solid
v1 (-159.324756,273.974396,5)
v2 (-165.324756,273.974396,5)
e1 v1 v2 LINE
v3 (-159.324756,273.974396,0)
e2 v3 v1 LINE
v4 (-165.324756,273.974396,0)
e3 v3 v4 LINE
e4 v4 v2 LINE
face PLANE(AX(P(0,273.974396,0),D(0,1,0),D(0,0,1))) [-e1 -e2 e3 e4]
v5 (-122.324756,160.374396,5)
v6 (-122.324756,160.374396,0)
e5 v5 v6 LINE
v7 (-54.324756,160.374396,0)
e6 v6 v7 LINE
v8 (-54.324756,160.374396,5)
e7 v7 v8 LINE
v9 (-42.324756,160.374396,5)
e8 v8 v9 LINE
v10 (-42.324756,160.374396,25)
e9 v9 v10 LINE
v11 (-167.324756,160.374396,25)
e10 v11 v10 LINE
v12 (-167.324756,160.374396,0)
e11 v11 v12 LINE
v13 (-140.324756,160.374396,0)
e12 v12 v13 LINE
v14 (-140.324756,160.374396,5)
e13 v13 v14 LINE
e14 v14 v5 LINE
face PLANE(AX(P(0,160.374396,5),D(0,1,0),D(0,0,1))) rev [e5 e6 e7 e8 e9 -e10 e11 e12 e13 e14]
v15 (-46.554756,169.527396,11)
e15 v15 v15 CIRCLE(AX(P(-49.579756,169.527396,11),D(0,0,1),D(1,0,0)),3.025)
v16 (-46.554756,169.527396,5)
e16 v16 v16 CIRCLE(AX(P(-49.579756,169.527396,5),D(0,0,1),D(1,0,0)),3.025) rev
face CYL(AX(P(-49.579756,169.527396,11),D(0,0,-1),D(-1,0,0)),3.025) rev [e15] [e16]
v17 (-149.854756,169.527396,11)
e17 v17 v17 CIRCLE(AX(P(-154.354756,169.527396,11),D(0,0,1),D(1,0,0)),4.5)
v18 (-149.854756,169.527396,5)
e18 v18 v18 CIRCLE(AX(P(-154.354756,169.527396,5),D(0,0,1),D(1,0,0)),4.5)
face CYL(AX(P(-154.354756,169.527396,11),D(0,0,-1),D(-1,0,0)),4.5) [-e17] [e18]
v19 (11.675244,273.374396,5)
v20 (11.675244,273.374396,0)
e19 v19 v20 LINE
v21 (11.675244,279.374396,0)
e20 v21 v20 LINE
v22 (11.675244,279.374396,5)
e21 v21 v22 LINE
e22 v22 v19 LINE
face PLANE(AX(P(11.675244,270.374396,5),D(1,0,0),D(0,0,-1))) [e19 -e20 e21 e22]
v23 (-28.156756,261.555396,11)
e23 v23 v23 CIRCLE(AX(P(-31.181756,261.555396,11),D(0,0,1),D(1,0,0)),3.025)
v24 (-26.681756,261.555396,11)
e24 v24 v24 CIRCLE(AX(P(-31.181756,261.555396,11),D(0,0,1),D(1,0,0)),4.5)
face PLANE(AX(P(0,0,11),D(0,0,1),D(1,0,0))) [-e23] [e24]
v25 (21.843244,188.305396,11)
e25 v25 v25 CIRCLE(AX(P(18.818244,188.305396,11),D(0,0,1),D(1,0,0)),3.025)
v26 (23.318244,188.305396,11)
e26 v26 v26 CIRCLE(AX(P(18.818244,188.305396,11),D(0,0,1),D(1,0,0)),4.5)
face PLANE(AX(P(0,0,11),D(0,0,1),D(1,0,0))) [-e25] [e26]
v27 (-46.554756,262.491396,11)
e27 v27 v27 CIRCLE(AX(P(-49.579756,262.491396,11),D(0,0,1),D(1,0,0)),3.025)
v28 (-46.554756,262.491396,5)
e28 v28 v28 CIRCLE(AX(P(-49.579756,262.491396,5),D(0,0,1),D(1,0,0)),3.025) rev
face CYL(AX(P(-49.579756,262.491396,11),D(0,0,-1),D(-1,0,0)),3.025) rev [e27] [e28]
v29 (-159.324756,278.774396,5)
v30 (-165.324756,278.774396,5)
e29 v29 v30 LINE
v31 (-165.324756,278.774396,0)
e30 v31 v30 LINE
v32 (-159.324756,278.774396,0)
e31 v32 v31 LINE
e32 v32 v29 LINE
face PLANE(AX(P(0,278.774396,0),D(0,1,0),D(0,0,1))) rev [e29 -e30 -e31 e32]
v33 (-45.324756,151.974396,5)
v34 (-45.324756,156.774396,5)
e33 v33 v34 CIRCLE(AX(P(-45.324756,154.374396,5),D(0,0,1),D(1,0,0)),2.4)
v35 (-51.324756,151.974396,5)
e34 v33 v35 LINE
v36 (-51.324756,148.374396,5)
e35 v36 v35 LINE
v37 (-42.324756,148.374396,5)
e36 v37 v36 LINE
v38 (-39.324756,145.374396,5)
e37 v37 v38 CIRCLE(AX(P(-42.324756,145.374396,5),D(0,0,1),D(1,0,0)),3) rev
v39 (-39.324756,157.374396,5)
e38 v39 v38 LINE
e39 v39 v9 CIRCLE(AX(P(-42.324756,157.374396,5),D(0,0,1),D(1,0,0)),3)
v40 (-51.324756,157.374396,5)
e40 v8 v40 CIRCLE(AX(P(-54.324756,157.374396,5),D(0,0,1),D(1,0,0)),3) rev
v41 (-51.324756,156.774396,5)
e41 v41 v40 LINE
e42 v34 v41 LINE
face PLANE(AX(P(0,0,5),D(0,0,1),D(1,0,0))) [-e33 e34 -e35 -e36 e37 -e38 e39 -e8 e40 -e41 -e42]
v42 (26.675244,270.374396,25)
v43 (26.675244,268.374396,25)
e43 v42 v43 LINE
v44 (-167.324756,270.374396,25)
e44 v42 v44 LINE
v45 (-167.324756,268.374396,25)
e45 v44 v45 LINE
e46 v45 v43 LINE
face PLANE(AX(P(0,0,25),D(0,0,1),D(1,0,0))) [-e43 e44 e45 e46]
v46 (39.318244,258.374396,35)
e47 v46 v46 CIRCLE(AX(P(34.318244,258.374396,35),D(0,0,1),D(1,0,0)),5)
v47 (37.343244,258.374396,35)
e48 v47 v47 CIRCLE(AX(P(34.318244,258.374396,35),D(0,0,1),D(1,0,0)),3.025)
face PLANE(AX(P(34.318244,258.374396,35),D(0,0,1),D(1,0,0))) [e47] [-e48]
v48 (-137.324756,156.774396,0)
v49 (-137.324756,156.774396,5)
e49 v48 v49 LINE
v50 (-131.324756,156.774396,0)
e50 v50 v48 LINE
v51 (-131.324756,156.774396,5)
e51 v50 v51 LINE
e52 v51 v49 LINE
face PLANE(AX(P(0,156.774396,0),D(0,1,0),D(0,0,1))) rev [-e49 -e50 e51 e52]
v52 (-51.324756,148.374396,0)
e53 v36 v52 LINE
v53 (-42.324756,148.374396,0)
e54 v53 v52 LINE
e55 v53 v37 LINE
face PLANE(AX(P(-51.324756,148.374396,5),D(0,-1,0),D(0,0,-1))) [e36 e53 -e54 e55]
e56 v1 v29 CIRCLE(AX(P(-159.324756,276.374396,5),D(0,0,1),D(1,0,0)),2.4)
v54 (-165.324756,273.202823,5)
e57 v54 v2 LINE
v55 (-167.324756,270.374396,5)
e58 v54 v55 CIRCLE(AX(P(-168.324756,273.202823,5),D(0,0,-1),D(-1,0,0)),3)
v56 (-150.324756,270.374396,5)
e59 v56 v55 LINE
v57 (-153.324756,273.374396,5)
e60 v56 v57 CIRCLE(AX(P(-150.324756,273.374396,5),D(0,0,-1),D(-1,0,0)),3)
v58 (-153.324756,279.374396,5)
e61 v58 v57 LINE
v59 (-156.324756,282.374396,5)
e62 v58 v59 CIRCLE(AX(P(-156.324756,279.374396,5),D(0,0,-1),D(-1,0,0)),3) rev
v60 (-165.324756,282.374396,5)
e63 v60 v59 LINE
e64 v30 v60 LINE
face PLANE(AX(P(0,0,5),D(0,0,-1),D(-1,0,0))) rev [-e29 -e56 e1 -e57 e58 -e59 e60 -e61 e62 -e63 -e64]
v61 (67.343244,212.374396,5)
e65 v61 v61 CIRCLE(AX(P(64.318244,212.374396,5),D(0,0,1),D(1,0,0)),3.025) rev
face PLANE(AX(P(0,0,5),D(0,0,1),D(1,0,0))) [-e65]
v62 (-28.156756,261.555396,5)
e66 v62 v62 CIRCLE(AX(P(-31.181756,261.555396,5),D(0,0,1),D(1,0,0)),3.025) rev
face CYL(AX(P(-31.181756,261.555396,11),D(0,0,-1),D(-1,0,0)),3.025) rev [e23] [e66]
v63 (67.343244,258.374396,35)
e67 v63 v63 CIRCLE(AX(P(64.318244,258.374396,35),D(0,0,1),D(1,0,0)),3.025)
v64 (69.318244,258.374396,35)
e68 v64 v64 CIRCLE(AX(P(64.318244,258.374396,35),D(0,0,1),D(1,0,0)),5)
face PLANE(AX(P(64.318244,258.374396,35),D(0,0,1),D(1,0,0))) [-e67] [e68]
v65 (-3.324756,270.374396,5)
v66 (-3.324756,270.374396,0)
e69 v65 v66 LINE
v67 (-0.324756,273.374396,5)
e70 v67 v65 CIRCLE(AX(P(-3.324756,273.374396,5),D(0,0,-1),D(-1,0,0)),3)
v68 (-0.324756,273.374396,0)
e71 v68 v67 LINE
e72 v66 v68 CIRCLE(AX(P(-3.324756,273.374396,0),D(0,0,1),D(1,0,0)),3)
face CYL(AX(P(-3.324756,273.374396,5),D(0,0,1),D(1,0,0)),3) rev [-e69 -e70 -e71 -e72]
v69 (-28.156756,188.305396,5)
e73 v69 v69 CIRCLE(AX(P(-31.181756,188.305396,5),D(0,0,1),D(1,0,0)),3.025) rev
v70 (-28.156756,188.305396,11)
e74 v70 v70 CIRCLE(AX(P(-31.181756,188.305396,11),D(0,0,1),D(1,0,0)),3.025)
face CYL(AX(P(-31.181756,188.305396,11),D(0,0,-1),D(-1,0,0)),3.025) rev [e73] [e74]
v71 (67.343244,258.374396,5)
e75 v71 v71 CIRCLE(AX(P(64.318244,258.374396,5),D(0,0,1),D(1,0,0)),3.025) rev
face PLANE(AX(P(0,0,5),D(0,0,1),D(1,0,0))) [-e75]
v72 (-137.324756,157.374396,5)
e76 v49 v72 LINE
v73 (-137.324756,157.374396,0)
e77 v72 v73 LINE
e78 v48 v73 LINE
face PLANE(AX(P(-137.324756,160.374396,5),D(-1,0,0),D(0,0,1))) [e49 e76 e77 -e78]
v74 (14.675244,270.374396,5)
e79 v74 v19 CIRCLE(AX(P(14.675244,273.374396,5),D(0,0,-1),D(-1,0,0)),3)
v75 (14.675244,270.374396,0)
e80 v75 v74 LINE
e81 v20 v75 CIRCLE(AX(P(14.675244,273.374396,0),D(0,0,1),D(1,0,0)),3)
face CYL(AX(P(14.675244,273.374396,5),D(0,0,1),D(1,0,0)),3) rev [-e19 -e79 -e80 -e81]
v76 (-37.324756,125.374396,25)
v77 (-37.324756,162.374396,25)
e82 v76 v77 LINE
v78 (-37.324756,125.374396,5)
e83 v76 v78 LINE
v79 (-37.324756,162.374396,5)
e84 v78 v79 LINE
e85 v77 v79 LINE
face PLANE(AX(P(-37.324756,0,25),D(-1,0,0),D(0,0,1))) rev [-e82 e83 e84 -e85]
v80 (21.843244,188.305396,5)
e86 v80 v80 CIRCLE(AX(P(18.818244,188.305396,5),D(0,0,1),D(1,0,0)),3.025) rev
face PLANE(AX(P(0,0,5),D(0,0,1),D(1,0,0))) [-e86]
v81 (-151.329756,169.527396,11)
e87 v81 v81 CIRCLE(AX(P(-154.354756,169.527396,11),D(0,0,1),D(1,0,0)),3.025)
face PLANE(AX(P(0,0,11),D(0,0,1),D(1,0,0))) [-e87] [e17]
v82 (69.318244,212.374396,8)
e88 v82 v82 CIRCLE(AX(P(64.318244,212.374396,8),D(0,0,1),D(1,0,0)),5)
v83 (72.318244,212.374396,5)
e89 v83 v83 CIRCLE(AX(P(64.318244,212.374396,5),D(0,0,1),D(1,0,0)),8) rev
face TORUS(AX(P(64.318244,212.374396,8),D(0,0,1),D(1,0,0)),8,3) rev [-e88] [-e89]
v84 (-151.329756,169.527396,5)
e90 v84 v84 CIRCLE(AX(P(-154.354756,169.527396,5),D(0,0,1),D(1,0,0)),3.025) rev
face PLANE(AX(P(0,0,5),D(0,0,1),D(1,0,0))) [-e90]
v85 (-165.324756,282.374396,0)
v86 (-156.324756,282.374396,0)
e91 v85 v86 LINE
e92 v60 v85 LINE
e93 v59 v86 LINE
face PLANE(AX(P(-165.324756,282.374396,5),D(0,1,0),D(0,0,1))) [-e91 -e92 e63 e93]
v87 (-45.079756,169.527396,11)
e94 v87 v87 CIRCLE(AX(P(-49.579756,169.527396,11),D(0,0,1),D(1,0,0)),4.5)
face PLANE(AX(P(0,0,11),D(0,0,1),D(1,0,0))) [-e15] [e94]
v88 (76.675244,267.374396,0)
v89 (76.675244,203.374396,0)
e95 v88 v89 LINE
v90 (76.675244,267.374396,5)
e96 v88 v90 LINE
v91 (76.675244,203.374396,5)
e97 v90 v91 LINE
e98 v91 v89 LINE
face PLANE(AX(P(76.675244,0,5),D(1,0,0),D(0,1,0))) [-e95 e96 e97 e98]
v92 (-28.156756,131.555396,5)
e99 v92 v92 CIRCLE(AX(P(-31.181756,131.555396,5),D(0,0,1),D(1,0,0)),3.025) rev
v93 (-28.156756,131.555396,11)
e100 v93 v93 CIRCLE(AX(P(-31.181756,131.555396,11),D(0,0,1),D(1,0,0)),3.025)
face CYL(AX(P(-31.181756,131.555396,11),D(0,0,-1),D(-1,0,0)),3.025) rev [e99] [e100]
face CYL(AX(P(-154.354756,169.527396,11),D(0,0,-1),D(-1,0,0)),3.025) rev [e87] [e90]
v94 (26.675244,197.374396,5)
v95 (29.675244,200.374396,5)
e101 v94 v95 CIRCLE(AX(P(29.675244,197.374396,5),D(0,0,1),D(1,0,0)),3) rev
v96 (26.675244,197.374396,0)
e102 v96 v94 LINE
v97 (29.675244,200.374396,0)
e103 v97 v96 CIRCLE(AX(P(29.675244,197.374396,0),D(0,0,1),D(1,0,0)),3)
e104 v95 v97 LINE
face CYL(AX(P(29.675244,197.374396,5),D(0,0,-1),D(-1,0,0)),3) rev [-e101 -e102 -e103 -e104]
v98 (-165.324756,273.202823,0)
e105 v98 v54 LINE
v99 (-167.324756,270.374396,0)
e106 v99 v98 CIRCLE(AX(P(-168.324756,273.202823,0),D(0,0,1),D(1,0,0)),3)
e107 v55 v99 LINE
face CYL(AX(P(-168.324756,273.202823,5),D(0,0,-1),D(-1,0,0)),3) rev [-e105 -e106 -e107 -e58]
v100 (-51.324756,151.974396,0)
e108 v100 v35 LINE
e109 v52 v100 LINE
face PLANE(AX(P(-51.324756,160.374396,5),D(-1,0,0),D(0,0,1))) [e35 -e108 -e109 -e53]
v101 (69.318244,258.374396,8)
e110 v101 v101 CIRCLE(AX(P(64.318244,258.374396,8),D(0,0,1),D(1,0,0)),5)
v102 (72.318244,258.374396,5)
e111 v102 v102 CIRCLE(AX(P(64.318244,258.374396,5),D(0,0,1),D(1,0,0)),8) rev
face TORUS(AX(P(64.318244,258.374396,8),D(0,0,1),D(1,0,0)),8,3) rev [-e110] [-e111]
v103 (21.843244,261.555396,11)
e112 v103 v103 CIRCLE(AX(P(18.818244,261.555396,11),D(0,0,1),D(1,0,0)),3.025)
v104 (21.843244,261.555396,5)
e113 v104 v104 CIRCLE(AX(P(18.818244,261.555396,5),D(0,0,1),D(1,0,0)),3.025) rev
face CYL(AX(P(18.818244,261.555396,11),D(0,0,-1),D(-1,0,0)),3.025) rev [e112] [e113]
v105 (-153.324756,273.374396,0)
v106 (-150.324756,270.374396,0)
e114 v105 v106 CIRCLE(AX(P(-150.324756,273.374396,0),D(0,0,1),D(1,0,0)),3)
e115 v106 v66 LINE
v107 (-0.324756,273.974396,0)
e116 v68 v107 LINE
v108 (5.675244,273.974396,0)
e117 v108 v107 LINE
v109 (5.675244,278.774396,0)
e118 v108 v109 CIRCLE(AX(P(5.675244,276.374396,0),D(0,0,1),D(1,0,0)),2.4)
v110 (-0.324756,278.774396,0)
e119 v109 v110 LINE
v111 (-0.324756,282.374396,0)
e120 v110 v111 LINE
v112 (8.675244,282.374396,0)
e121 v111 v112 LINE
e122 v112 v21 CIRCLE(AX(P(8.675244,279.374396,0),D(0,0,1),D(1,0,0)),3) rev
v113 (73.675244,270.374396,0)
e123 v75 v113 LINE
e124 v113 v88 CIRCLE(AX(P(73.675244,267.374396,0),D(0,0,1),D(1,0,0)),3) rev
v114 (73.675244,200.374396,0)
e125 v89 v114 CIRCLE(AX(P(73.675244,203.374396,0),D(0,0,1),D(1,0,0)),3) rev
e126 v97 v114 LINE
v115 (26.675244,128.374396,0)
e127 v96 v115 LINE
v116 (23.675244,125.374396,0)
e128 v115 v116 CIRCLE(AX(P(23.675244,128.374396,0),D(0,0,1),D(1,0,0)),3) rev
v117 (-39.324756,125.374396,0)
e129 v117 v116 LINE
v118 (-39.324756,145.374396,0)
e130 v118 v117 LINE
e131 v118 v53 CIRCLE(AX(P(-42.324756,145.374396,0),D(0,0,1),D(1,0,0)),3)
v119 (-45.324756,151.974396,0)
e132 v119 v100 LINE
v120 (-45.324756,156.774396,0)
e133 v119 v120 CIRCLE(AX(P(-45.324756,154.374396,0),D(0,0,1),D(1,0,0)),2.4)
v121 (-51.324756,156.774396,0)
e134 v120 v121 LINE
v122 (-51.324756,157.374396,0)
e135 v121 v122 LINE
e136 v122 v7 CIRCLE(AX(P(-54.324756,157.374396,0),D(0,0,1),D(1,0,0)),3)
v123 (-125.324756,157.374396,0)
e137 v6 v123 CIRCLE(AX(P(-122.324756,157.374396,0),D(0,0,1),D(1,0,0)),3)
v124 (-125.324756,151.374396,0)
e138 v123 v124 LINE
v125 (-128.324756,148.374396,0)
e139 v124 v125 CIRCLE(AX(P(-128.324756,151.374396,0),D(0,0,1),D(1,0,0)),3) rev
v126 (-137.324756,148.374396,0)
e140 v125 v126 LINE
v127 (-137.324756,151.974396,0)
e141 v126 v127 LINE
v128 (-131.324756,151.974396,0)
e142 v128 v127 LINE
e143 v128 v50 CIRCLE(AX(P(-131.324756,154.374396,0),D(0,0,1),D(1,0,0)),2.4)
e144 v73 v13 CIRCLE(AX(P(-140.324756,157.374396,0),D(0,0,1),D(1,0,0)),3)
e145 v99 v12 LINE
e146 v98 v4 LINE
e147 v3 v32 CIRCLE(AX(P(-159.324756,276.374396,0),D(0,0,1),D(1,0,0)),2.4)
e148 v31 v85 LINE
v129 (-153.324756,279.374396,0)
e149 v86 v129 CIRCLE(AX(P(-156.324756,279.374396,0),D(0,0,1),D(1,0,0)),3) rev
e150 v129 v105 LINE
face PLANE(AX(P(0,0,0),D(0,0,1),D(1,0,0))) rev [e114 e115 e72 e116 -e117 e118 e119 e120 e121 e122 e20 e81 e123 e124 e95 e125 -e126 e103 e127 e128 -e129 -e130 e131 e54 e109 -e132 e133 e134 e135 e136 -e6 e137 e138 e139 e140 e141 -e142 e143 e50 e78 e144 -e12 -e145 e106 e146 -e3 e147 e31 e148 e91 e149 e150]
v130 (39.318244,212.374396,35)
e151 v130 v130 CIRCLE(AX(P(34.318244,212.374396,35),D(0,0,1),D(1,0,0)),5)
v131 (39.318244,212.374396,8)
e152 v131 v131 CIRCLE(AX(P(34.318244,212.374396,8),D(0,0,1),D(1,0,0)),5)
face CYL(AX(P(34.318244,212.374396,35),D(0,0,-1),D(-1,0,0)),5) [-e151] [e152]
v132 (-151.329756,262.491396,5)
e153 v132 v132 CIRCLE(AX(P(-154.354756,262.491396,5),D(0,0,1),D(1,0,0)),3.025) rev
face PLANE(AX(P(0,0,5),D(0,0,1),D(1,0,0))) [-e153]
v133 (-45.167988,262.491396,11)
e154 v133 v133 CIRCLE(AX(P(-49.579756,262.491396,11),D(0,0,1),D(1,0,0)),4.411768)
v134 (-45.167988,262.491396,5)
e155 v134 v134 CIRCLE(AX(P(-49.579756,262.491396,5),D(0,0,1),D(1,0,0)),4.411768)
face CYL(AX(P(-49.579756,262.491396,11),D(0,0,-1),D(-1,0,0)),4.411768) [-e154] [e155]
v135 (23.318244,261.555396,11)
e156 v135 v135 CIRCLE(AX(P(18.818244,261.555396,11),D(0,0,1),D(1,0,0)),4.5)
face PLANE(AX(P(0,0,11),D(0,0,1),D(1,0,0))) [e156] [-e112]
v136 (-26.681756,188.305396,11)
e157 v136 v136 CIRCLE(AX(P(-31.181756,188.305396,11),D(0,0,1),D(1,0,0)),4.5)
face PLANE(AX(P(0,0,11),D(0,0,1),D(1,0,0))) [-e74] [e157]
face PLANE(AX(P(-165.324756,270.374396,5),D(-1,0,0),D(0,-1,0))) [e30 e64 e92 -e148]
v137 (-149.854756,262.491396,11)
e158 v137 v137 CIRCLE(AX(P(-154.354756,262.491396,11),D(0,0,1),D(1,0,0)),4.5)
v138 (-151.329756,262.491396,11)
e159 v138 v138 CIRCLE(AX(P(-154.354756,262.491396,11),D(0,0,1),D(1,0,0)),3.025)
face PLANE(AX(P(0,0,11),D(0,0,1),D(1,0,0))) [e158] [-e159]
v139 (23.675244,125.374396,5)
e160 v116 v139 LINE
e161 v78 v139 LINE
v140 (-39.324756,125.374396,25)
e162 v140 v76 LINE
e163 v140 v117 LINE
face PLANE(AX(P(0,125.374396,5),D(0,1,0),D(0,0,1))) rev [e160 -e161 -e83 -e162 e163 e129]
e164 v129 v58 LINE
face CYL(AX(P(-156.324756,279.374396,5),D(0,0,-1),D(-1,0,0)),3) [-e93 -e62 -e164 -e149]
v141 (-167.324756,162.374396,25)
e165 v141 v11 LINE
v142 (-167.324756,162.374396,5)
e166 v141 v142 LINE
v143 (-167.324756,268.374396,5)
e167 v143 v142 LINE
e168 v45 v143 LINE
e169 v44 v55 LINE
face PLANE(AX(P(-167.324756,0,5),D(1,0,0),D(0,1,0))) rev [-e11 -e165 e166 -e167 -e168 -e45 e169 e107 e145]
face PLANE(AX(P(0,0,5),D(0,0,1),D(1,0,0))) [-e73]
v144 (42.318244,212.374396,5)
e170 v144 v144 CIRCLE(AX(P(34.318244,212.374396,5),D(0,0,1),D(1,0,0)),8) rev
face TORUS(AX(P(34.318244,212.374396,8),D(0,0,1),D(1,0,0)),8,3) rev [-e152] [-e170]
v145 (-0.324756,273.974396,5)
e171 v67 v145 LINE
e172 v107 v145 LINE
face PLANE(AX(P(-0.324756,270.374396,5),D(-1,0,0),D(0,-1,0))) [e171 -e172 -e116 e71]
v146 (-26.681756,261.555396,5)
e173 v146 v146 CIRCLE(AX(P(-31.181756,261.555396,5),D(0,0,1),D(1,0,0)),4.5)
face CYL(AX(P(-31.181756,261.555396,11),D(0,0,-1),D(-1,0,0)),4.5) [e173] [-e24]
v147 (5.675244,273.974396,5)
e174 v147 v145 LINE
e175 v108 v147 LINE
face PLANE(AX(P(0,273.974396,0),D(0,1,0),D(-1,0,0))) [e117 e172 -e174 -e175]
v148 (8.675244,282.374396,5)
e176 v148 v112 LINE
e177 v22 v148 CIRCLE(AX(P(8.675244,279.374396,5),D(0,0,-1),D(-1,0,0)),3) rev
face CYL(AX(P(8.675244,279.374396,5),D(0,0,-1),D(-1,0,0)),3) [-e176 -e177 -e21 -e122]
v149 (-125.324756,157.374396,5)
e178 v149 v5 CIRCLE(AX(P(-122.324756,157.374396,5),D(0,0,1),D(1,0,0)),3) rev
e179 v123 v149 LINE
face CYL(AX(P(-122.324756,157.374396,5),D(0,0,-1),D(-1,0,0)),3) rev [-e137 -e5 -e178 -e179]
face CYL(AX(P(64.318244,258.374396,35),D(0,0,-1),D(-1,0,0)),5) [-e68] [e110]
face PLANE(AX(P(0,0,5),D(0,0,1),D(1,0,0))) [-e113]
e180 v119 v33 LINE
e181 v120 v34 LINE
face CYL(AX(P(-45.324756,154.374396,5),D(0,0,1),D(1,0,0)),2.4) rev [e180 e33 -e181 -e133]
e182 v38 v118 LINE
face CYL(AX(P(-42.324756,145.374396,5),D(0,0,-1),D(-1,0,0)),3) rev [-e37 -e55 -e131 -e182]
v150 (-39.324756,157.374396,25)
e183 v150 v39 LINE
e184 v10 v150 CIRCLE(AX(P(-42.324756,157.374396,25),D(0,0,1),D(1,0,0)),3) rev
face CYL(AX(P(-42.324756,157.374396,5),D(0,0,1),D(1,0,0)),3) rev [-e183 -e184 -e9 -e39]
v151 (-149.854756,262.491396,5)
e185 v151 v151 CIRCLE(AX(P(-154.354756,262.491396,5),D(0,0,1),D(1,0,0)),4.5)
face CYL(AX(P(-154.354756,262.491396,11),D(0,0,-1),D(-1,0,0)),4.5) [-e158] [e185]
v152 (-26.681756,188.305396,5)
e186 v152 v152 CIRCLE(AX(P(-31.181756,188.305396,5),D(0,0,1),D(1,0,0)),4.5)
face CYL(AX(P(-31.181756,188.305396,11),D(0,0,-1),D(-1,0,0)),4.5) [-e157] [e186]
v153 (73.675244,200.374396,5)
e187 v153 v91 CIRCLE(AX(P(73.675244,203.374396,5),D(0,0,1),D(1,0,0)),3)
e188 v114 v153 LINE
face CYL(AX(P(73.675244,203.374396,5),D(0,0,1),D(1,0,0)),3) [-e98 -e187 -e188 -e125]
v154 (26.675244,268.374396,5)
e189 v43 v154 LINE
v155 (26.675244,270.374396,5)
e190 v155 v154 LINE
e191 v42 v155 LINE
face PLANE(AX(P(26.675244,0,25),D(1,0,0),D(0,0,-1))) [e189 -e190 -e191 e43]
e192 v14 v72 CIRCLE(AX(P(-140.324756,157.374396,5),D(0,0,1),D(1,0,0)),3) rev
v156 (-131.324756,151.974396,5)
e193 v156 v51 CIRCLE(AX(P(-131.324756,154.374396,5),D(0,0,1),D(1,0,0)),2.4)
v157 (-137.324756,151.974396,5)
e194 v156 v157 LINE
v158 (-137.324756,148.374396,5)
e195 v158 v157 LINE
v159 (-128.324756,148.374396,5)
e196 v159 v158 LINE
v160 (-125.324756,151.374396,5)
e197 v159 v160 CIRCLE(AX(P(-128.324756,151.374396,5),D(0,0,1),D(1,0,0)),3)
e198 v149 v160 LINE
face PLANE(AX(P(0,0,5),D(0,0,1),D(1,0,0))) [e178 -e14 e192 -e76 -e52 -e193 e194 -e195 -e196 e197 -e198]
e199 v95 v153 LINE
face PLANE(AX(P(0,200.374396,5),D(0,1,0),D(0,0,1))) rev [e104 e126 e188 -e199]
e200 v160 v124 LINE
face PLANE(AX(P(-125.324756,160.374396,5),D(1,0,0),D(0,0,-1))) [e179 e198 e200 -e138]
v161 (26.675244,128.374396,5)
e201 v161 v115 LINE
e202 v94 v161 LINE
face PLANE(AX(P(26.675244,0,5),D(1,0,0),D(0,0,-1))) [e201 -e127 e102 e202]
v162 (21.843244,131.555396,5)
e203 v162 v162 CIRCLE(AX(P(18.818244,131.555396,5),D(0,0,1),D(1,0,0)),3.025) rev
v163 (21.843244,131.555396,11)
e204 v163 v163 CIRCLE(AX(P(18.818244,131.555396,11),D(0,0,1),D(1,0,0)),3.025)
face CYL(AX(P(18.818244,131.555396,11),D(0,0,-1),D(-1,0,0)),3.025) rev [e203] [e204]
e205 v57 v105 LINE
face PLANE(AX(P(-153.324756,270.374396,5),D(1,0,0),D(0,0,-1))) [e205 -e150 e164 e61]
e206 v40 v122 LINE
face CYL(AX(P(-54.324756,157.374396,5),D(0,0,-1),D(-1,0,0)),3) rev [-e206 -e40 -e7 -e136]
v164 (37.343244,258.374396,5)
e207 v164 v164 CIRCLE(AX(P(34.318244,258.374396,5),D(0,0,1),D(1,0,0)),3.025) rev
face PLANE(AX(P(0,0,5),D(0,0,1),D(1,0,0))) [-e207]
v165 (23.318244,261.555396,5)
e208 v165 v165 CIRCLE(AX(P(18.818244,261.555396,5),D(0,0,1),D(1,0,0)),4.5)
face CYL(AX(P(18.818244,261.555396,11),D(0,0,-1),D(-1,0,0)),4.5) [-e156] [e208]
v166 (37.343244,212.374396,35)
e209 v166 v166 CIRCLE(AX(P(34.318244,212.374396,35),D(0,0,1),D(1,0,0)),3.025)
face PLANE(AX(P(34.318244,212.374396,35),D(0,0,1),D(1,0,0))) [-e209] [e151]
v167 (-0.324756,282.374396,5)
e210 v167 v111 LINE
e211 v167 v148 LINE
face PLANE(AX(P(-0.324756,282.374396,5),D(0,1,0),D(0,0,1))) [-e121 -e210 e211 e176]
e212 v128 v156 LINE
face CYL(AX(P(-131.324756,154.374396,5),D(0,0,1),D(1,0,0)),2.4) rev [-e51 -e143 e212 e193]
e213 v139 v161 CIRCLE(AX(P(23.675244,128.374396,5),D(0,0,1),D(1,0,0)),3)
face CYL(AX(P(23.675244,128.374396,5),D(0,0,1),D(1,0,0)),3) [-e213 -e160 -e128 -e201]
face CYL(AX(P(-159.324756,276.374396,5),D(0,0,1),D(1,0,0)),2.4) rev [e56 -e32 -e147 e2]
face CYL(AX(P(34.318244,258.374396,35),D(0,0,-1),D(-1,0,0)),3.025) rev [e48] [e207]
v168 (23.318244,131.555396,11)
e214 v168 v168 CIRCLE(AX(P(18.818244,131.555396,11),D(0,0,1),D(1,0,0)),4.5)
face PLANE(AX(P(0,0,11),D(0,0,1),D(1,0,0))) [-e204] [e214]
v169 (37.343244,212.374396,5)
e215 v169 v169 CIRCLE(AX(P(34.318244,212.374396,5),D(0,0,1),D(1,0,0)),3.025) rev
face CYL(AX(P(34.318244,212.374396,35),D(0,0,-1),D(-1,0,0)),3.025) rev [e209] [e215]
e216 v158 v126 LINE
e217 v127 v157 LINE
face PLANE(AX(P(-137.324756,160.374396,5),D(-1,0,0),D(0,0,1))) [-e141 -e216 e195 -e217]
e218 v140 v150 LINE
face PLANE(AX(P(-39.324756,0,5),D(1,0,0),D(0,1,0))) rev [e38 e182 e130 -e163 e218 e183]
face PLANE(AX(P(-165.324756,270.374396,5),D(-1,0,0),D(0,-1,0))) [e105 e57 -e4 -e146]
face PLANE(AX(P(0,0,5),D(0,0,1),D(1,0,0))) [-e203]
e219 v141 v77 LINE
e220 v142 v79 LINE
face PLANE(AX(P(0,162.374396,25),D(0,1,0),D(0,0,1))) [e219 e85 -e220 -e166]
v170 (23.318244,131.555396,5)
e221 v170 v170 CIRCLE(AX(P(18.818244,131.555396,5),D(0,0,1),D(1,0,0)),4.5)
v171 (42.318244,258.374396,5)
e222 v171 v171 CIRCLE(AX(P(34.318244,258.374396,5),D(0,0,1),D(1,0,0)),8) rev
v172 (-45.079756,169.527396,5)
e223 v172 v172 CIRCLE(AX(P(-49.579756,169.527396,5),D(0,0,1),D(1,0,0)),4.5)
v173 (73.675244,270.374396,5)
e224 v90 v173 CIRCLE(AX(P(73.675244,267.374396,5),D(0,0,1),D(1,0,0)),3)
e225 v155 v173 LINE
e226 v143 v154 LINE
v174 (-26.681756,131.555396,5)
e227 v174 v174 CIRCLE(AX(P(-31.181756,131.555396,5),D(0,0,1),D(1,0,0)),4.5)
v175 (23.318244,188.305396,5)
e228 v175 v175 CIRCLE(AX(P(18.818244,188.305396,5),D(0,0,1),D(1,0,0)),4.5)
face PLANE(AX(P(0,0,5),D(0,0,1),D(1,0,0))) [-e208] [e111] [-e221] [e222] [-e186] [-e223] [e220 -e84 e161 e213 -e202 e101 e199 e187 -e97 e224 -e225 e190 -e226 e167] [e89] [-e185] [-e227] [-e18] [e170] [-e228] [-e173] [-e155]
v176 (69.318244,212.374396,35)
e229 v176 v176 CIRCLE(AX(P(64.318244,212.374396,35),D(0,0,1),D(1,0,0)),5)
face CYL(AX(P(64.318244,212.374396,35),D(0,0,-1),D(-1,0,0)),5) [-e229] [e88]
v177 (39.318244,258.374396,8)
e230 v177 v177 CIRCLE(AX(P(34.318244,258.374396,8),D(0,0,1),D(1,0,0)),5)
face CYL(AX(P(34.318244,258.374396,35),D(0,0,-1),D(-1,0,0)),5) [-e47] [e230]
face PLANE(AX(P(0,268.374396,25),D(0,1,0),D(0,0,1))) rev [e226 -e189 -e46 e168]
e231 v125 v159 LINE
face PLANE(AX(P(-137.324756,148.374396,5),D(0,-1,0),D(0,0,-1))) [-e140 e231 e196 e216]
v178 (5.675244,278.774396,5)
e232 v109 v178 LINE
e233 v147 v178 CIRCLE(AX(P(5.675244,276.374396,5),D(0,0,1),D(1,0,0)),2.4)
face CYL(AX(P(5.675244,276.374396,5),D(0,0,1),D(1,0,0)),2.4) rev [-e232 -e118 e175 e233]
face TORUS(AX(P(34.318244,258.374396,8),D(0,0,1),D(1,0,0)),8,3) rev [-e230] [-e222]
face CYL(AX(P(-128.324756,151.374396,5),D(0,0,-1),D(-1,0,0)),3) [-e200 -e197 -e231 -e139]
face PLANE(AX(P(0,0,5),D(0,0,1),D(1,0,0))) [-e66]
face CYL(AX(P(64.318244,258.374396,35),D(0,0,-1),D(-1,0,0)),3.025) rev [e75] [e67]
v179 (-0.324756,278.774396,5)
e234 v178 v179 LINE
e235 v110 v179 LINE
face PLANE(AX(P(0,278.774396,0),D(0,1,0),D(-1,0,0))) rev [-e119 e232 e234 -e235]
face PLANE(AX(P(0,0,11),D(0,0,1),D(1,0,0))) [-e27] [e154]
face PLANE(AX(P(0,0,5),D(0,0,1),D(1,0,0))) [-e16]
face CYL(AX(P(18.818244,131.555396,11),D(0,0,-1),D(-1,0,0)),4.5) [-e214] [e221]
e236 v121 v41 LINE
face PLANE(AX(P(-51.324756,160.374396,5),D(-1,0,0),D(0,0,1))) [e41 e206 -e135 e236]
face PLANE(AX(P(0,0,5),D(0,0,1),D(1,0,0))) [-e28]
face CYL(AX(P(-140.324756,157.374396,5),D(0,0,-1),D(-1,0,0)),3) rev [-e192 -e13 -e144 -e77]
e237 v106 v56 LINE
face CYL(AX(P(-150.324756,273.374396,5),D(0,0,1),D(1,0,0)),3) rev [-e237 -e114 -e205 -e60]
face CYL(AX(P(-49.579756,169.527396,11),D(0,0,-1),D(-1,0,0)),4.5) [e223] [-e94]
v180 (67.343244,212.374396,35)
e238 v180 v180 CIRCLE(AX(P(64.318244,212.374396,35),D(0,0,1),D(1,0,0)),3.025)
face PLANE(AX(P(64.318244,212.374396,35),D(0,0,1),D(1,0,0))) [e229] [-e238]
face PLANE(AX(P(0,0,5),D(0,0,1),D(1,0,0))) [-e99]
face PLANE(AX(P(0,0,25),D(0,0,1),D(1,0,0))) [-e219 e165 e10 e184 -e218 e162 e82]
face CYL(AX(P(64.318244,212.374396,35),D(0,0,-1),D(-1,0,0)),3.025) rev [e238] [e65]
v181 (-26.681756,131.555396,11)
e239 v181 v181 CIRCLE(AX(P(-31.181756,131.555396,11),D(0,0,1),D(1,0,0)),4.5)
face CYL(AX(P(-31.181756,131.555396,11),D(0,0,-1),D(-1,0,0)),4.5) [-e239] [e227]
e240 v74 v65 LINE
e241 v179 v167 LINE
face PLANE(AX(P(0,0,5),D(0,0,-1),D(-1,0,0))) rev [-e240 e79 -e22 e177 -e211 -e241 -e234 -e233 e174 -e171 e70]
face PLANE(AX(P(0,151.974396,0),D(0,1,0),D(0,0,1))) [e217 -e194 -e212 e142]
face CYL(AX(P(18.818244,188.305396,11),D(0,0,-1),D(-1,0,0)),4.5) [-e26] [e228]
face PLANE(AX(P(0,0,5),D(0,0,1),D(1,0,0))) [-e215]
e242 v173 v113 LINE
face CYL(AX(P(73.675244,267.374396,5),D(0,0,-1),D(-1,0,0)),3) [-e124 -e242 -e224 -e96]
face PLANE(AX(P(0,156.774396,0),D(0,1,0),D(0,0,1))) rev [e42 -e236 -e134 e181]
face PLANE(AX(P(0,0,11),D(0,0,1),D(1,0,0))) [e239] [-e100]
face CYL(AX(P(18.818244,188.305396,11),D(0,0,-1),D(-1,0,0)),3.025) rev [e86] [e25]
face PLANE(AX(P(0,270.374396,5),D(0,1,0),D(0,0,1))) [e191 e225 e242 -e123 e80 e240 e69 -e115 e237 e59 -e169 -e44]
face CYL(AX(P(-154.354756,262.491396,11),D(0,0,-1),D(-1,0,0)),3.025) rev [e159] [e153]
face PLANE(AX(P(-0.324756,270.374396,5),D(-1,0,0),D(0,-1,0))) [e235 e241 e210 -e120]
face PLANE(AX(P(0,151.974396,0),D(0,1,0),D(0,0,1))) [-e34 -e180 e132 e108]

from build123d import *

# Parameters (mm, degrees)
SKETCH1_W            = 128
SKETCH1_H            = 110
SKETCH1_W_2          = 50
SKETCH1_H_2          = 70
BOSS_EXTRUDE1_DEPTH  = 5
SKETCH2_R            = 4.5
SKETCH2_R_2          = 3.025
SKETCH2_R_3          = 4.411768353
BOSS_EXTRUDE2_DEPTH  = 6
SKETCH3_W            = 194
SKETCH3_H            = 2
BOSS_EXTRUDE3_DEPTH  = 20
SKETCH6_W            = 12
SKETCH6_H            = 12
BOSS_EXTRUDE5_DEPTH  = 5
M4_CLEARANCE_HOLE1_D = 4.8
CUT_EXTRUDE1_DEPTH   = 329.83563266
FILLET2_R            = 3
FILLET3_R            = 3
SKETCH11_R           = 5
SKETCH11_R_2         = 3.025
BOSS_EXTRUDE6_DEPTH  = 30
FILLET4_R            = 3


with BuildPart() as part:
    # Sketch1 → Boss-Extrude1 (new body)
    with BuildSketch(Plane.XY):
        with Locations((-103.32475602, 215.37439567)):
            Rectangle(SKETCH1_W, SKETCH1_H)
        Polygon((26.67524398, 270.37439567), (-39.32475602, 270.37439567), (-39.32475602, 160.37439567), (-39.32475602, 125.37439567), (26.67524398, 125.37439567), (26.67524398, 195.37439567), (26.67524398, 200.37439567), align=None)
        with Locations((51.67524398, 235.37439567)):
            Rectangle(SKETCH1_W_2, SKETCH1_H_2)
    extrude(amount=BOSS_EXTRUDE1_DEPTH)

    # Sketch2 → Boss-Extrude2 (add)
    # profile 1 of 10: a face of its own
    with BuildSketch(Plane.XY.offset(5)):
        with Locations((-49.57975602, 169.52739567)):
            Circle(SKETCH2_R)
        with Locations((-49.57975602, 169.52739567)):
            Circle(SKETCH2_R_2, mode=Mode.SUBTRACT)
    # profile 2 of 10: a face of its own
    with BuildSketch(Plane.XY.offset(5)):
        with Locations((-31.18175602, 188.30539567)):
            Circle(SKETCH2_R)
        with Locations((-31.18175602, 188.30539567)):
            Circle(SKETCH2_R_2, mode=Mode.SUBTRACT)
    # profile 3 of 10: a face of its own
    with BuildSketch(Plane.XY.offset(5)):
        with Locations((-31.18175602, 131.55539567)):
            Circle(SKETCH2_R)
        with Locations((-31.18175602, 131.55539567)):
            Circle(SKETCH2_R_2, mode=Mode.SUBTRACT)
    # profile 4 of 10: a face of its own
    with BuildSketch(Plane.XY.offset(5)):
        with Locations((18.81824398, 131.55539567)):
            Circle(SKETCH2_R)
        with Locations((18.81824398, 131.55539567)):
            Circle(SKETCH2_R_2, mode=Mode.SUBTRACT)
    # profile 5 of 10: a face of its own
    with BuildSketch(Plane.XY.offset(5)):
        with Locations((18.81824398, 188.30539567)):
            Circle(SKETCH2_R)
        with Locations((18.81824398, 188.30539567)):
            Circle(SKETCH2_R_2, mode=Mode.SUBTRACT)
    # profile 6 of 10: a face of its own
    with BuildSketch(Plane.XY.offset(5)):
        with Locations((18.81824398, 261.55539567)):
            Circle(SKETCH2_R)
        with Locations((18.81824398, 261.55539567)):
            Circle(SKETCH2_R_2, mode=Mode.SUBTRACT)
    # profile 7 of 10: a face of its own
    with BuildSketch(Plane.XY.offset(5)):
        with Locations((-49.57975602, 262.49139567)):
            Circle(SKETCH2_R_3)
        with Locations((-49.57975602, 262.49139567)):
            Circle(SKETCH2_R_2, mode=Mode.SUBTRACT)
    # profile 8 of 10: a face of its own
    with BuildSketch(Plane.XY.offset(5)):
        with Locations((-154.35475602, 262.49139567)):
            Circle(SKETCH2_R)
        with Locations((-154.35475602, 262.49139567)):
            Circle(SKETCH2_R_2, mode=Mode.SUBTRACT)
    # profile 9 of 10: a face of its own
    with BuildSketch(Plane.XY.offset(5)):
        with Locations((-154.35475602, 169.52739567)):
            Circle(SKETCH2_R)
        with Locations((-154.35475602, 169.52739567)):
            Circle(SKETCH2_R_2, mode=Mode.SUBTRACT)
    # profile 10 of 10: a face of its own
    with BuildSketch(Plane.XY.offset(5)):
        with Locations((-31.18175602, 261.55539567)):
            Circle(SKETCH2_R)
        with Locations((-31.18175602, 261.55539567)):
            Circle(SKETCH2_R_2, mode=Mode.SUBTRACT)
    extrude(amount=BOSS_EXTRUDE2_DEPTH)

    # Sketch3 → Boss-Extrude3 (add)
    with BuildSketch(Plane.XY.offset(5)):
        with Locations((-70.32475602, 269.37439567)):
            Rectangle(SKETCH3_W, SKETCH3_H)
        Polygon((-167.32475602, 162.37439567), (-167.32475602, 160.37439567), (-39.32475602, 160.37439567), (-39.32475602, 125.37439567), (-37.32475602, 125.37439567), (-37.32475602, 162.37439567), align=None)
    extrude(amount=BOSS_EXTRUDE3_DEPTH)

    # Sketch6 → Boss-Extrude5 (add)
    with BuildSketch(Plane(origin=(0, 0, 0), x_dir=(-1, 0, 0), z_dir=(0, 0, -1))):
        with Locations((131.32475602, 154.37439567)):
            Rectangle(SKETCH6_W, SKETCH6_H)
        with Locations((159.32475602, 276.37439567)):
            Rectangle(SKETCH6_W, SKETCH6_H)
        with Locations((45.32475602, 154.37439567)):
            Rectangle(SKETCH6_W, SKETCH6_H)
        with Locations((-5.67524398, 276.37439567)):
            Rectangle(SKETCH6_W, SKETCH6_H)
    extrude(amount=-BOSS_EXTRUDE5_DEPTH)

    # M4 Clearance Hole1 (through all)
    with Locations(Plane.XY.offset(5)):
        with Locations((-131.32475602, 154.37439567), (-159.32475602, 276.37439567), (5.67524398, 276.37439567), (-45.32475602, 154.37439567)):
            Hole(M4_CLEARANCE_HOLE1_D / 2)

    # Sketch10 → Cut-Extrude1 (cut, through all)
    with BuildSketch(Plane.XY.offset(5)):
        with BuildLine():
            ThreePointArc((-131.32475602, 151.97439567), (-133.72475602, 154.37439567), (-131.32475602, 156.77439567))
            Line((-131.32475602, 156.77439567), (-137.32475602, 156.77439567))
            Line((-137.32475602, 156.77439567), (-137.32475602, 151.97439567))
            Line((-137.32475602, 151.97439567), (-131.32475602, 151.97439567))
        make_face()
        with BuildLine():
            ThreePointArc((-159.32475602, 273.97439567), (-161.72475602, 276.37439567), (-159.32475602, 278.77439567))
            Line((-159.32475602, 278.77439567), (-165.32475602, 278.77439567))
            Line((-165.32475602, 278.77439567), (-165.32475602, 273.97439567))
            Line((-165.32475602, 273.97439567), (-159.32475602, 273.97439567))
        make_face()
        with BuildLine():
            ThreePointArc((5.67524398, 273.97439567), (3.27524398, 276.37439567), (5.67524398, 278.77439567))
            Line((5.67524398, 278.77439567), (-0.32475602, 278.77439567))
            Line((-0.32475602, 278.77439567), (-0.32475602, 273.97439567))
            Line((-0.32475602, 273.97439567), (5.67524398, 273.97439567))
        make_face()
        with BuildLine():
            ThreePointArc((-45.32475602, 151.97439567), (-47.72475602, 154.37439567), (-45.32475602, 156.77439567))
            Line((-45.32475602, 156.77439567), (-51.32475602, 156.77439567))
            Line((-51.32475602, 156.77439567), (-51.32475602, 151.97439567))
            Line((-51.32475602, 151.97439567), (-45.32475602, 151.97439567))
        make_face()
    extrude(amount=-CUT_EXTRUDE1_DEPTH, mode=Mode.SUBTRACT)

    # Fillet2
    # the kernel refuses this fillet: 3 mm, written as the material it adds along each edge
    with BuildSketch(Plane(origin=(-137.32475602, 160.37439567, 0), x_dir=(-1, 0, 0), z_dir=(0, 0, 1)), Plane(origin=(-153.32475602, 270.37439567, 0), x_dir=(1, 0, 0), z_dir=(0, 0, 1)), Plane(origin=(-51.32475602, 160.37439567, 0), x_dir=(-1, 0, 0), z_dir=(0, 0, 1)), Plane(origin=(11.67524398, 270.37439567, 0), x_dir=(1, 0, 0), z_dir=(0, 0, 1))) as fillet2_piece_1:
        with BuildLine():
            CenterArc((FILLET2_R, FILLET2_R), FILLET2_R, 180, 90)
            Line((0, FILLET2_R), (0, 0))
            Line((0, 0), (FILLET2_R, 0))
        make_face()
    extrude(amount=5)
    with BuildSketch(Plane(origin=(-125.32475602, 160.37439567, 0), x_dir=(1, 0, 0), z_dir=(0, 0, 1)), Plane(origin=(-39.32475602, 148.37439567, 0), x_dir=(0, -1, 0), z_dir=(0, 0, 1)), Plane(origin=(-0.32475602, 270.37439567, 0), x_dir=(-1, 0, 0), z_dir=(0, 0, 1))) as fillet2_piece_2:
        with BuildLine():
            CenterArc((FILLET2_R, -FILLET2_R), FILLET2_R, 90, 90)
            Line((0, -FILLET2_R), (0, 0))
            Line((0, 0), (FILLET2_R, 0))
        make_face()
    extrude(amount=5)
    with BuildSketch(Plane(origin=(-165.32475602, 270.37439567, 0), x_dir=(-1, 0, 0), z_dir=(0, 0, 1))) as fillet2_piece_3:
        with BuildLine():
            CenterArc((3, -2.828427125), FILLET2_R, 109.471220634, 70.528779366)
            Line((0, -2.828427125), (0, 0))
            Line((0, 0), (2, 0))
        make_face()
    extrude(amount=5)
    # the kernel refuses this fillet: 3 mm, written as the material it takes off along each edge
    with BuildSketch(Plane(origin=(-125.32475602, 148.37439567, -7.5), x_dir=(0, 1, 0), z_dir=(0, 0, 1))) as fillet2_2_piece_1:
        with BuildLine():
            CenterArc((FILLET2_R, FILLET2_R), FILLET2_R, 180, 90)
            Line((0, FILLET2_R), (0, 0))
            Line((0, 0), (FILLET2_R, 0))
        make_face()
    extrude(amount=20, mode=Mode.SUBTRACT)
    with BuildSketch(Plane(origin=(-153.32475602, 282.37439567, -7.5), x_dir=(0, -1, 0), z_dir=(0, 0, 1)), Plane(origin=(11.67524398, 282.37439567, -7.5), x_dir=(0, -1, 0), z_dir=(0, 0, 1))) as fillet2_2_piece_2:
        with BuildLine():
            CenterArc((FILLET2_R, -FILLET2_R), FILLET2_R, 90, 90)
            Line((0, -FILLET2_R), (0, 0))
            Line((0, 0), (FILLET2_R, 0))
        make_face()
    extrude(amount=20, mode=Mode.SUBTRACT)

    # Fillet3
    fillet3_edges = [part.edges().sort_by_distance(p)[0] for p in [
        (76.67524398, 270.37439567, 2.5),
        (76.67524398, 200.37439567, 2.5),
        (26.67524398, 200.37439567, 2.5),
        (26.67524398, 125.37439567, 2.5),
        (-39.32475602, 160.37439567, 15),
    ]]
    fillet(fillet3_edges, radius=FILLET3_R)

    # Sketch11 → Boss-Extrude6 (add)
    # profile 1 of 4: a face of its own
    with BuildSketch(Plane.XY.offset(5)):
        with Locations((34.31824398, 258.37439567)):
            Circle(SKETCH11_R)
        with Locations((34.31824398, 258.37439567)):
            Circle(SKETCH11_R_2, mode=Mode.SUBTRACT)
    # profile 2 of 4: a face of its own
    with BuildSketch(Plane.XY.offset(5)):
        with Locations((64.31824398, 258.37439567)):
            Circle(SKETCH11_R)
        with Locations((64.31824398, 258.37439567)):
            Circle(SKETCH11_R_2, mode=Mode.SUBTRACT)
    # profile 3 of 4: a face of its own
    with BuildSketch(Plane.XY.offset(5)):
        with Locations((64.31824398, 212.37439567)):
            Circle(SKETCH11_R)
        with Locations((64.31824398, 212.37439567)):
            Circle(SKETCH11_R_2, mode=Mode.SUBTRACT)
    # profile 4 of 4: a face of its own
    with BuildSketch(Plane.XY.offset(5)):
        with Locations((34.31824398, 212.37439567)):
            Circle(SKETCH11_R)
        with Locations((34.31824398, 212.37439567)):
            Circle(SKETCH11_R_2, mode=Mode.SUBTRACT)
    extrude(amount=BOSS_EXTRUDE6_DEPTH)

    # Fillet4
    fillet4_edges = [part.edges().sort_by_distance(p)[0] for p in [
        (29.31824398, 258.37439567, 5),
        (59.31824398, 258.37439567, 5),
        (59.31824398, 212.37439567, 5),
        (29.31824398, 212.37439567, 5),
    ]]
    fillet(fillet4_edges, radius=FILLET4_R)


solid = part.part
